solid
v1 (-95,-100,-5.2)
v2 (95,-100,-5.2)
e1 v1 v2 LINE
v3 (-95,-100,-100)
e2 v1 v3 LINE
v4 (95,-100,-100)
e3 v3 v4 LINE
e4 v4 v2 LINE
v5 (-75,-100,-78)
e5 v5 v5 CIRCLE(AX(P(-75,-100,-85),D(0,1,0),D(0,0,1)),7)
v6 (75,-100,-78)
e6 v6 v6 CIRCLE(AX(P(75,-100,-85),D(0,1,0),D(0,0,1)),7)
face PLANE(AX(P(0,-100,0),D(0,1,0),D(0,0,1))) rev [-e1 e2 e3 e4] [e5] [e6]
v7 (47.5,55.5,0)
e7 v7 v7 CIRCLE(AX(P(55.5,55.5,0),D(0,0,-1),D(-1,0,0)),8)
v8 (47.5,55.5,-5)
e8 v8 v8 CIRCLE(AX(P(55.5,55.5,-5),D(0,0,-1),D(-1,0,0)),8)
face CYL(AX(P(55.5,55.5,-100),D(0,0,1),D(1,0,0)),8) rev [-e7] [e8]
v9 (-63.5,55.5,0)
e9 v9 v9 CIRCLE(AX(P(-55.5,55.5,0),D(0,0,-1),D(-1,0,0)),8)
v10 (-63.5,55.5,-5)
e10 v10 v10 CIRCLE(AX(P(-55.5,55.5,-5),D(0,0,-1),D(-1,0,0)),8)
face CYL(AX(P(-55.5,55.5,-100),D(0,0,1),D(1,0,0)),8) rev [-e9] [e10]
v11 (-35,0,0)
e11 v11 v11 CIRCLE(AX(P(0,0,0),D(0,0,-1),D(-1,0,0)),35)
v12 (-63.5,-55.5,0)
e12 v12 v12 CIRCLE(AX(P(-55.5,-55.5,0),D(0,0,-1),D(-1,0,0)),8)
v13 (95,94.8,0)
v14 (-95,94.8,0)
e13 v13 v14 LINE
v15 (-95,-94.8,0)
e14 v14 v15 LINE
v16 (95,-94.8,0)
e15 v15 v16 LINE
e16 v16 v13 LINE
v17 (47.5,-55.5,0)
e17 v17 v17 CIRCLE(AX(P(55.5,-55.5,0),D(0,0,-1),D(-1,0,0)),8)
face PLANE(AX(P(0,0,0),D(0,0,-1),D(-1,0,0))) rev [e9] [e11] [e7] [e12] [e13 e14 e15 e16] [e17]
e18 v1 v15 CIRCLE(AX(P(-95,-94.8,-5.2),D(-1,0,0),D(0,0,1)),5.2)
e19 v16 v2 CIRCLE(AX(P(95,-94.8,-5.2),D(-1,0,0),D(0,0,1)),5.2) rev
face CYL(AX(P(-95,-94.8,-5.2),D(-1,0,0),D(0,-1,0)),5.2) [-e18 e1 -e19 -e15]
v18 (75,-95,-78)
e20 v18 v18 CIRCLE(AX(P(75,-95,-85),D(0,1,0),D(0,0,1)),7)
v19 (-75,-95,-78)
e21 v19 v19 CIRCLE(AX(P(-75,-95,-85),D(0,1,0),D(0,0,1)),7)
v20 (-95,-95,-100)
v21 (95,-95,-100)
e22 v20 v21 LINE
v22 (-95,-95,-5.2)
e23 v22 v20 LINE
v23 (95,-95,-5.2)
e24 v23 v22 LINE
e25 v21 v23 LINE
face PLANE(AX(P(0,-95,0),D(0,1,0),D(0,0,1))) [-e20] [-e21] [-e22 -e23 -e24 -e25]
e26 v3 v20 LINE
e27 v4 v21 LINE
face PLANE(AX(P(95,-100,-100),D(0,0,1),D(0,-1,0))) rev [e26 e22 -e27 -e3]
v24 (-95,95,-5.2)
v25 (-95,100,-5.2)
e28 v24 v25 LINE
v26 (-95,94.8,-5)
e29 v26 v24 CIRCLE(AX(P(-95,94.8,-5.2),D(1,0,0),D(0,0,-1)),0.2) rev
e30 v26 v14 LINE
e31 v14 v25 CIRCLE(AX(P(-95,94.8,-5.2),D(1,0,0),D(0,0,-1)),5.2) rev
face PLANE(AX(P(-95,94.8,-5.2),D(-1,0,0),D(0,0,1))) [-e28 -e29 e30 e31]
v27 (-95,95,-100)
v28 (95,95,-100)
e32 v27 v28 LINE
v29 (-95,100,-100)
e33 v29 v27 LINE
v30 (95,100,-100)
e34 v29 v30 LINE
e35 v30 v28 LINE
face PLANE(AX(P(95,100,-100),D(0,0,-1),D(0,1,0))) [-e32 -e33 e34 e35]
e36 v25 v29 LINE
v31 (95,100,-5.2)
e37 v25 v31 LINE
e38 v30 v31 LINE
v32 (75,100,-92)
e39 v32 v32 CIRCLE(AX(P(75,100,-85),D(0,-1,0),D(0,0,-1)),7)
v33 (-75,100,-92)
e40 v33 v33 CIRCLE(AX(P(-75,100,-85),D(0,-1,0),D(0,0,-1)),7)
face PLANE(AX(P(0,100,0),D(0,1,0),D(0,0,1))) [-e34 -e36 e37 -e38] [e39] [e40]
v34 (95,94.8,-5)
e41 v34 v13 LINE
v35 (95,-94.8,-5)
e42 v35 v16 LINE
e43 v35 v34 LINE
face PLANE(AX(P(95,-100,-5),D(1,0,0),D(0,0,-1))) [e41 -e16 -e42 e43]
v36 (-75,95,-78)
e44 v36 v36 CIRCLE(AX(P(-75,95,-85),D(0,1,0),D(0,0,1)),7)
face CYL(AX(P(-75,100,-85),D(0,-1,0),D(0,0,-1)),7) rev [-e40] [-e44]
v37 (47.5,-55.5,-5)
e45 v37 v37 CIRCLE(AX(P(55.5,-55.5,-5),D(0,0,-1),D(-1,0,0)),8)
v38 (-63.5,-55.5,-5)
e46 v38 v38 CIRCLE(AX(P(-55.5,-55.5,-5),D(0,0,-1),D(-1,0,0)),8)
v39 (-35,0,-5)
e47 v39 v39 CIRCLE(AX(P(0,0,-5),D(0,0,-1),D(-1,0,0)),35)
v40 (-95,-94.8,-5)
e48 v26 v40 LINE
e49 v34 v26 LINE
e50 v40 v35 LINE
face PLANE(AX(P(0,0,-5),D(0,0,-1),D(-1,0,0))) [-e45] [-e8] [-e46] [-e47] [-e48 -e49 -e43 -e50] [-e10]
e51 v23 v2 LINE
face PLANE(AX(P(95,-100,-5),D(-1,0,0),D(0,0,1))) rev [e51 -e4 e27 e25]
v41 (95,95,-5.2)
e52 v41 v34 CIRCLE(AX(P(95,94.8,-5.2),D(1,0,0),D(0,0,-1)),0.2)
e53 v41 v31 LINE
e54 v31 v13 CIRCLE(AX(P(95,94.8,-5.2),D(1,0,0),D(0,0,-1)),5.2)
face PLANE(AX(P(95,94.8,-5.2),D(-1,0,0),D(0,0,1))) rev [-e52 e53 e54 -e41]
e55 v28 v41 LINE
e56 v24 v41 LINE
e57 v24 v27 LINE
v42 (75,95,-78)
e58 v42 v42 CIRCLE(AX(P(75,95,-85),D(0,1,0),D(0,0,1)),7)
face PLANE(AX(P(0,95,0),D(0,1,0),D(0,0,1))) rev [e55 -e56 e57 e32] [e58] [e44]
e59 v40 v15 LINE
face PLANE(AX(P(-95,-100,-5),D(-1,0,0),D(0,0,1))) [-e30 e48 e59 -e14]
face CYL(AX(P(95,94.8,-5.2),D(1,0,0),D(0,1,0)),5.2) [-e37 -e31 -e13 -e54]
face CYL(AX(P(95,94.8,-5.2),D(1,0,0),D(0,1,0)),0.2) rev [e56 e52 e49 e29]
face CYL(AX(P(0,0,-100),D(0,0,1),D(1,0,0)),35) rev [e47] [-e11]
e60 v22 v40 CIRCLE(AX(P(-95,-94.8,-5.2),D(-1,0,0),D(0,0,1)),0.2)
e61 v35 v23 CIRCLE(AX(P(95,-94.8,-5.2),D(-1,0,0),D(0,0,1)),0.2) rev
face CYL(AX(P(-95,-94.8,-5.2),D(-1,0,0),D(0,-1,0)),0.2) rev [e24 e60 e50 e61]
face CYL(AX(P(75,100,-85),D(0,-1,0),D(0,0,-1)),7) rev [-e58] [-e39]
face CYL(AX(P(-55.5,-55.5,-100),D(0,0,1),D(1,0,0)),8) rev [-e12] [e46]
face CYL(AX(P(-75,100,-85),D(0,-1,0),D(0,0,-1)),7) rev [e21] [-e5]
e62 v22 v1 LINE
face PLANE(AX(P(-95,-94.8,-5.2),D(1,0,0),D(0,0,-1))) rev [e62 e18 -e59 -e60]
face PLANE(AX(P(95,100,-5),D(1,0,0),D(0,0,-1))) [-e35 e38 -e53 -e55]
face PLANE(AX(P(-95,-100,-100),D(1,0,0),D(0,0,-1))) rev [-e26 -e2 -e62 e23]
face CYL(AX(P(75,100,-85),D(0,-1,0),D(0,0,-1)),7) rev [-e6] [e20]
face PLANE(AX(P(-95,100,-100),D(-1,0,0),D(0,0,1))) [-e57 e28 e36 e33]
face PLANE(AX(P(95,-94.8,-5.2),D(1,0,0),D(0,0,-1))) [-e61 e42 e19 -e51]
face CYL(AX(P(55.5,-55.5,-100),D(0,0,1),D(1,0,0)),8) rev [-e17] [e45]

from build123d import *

# Parameters (mm, degrees)
SKETCH1_W                    = 190
SKETCH1_H                    = 200
BASE_FLANGE1_DEPTH           = 5
EDGE_FLANGE1_STRIP_W         = 20.4
EDGE_FLANGE1_STRIP_H         = 5
EDGE_FLANGE1_STRIP_CUT_DEPTH = 190
EDGE_FLANGE1_DEPTH           = 190
EDGE_FLANGE2_STRIP_W         = 20.4
EDGE_FLANGE2_STRIP_H         = 5
EDGE_FLANGE2_STRIP_CUT_DEPTH = 190
EDGE_FLANGE2_DEPTH           = 190
CUT_EXTRUDE1_DEPTH           = 171.367250374
CUT_EXTRUDE1_DEPTH_BACK      = 171.367250374
SKETCH12_R                   = 35
CUT_EXTRUDE2_DEPTH           = 171.367250374
CUT_EXTRUDE2_DEPTH_BACK      = 171.367250374
SKETCH13_R                   = 8
CUT_EXTRUDE3_DEPTH           = 243.950612265
CUT_EXTRUDE3_DEPTH_BACK      = 243.950612265
SKETCH14_R                   = 7


# Sheet-metal steps are written as plain solids
with BuildPart() as part:
    # Sketch1 → Base-Flange1 (new body)
    with BuildSketch(Plane.XY):
        Rectangle(SKETCH1_W, SKETCH1_H)
    extrude(amount=-BASE_FLANGE1_DEPTH)

    # Edge-Flange1 strip (across the edge) → Edge-Flange1 strip cut (cut)
    with BuildSketch(Plane(origin=(-95, 100, -5), x_dir=(0, -1, 0), z_dir=(1, 0, 0))):
        with Locations((-5, -2.5)):
            Rectangle(EDGE_FLANGE1_STRIP_W, EDGE_FLANGE1_STRIP_H)
    extrude(amount=EDGE_FLANGE1_STRIP_CUT_DEPTH, mode=Mode.SUBTRACT)

    # Edge-Flange1 section (across the edge) → Edge-Flange1 (add)
    with BuildSketch(Plane(origin=(-95, 100, -5), x_dir=(0, -1, 0), z_dir=(1, 0, 0))):
        with BuildLine():
            Line((0, 0.2), (0, 95))
            Line((0, 95), (5, 95))
            Line((5, 95), (5, 0.2))
            ThreePointArc((5, 0.2), (5.058578644, 0.058578644), (5.2, 0))
            Line((5.2, 0), (5.2, -5))
            ThreePointArc((5.2, -5), (1.523044738, -3.476955262), (0, 0.2))
        make_face()
    extrude(amount=EDGE_FLANGE1_DEPTH)

    # Edge-Flange2 strip (across the edge) → Edge-Flange2 strip cut (cut)
    with BuildSketch(Plane(origin=(95, -100, -5), x_dir=(0, 1, 0), z_dir=(-1, 0, 0))):
        with Locations((-5, -2.5)):
            Rectangle(EDGE_FLANGE2_STRIP_W, EDGE_FLANGE2_STRIP_H)
    extrude(amount=EDGE_FLANGE2_STRIP_CUT_DEPTH, mode=Mode.SUBTRACT)

    # Edge-Flange2 section (across the edge) → Edge-Flange2 (add)
    with BuildSketch(Plane(origin=(95, -100, -5), x_dir=(0, 1, 0), z_dir=(-1, 0, 0))):
        with BuildLine():
            Line((0, 0.2), (0, 95))
            Line((0, 95), (5, 95))
            Line((5, 95), (5, 0.2))
            ThreePointArc((5, 0.2), (5.058578644, 0.058578644), (5.2, 0))
            Line((5.2, 0), (5.2, -5))
            ThreePointArc((5.2, -5), (1.523044738, -3.476955262), (0, 0.2))
        make_face()
    extrude(amount=EDGE_FLANGE2_DEPTH)

    # Sketch12 → Cut-Extrude1 (cut, two sides: drawn at the far end of the back side and taken through both)
    with BuildSketch(Plane.XY.offset(-CUT_EXTRUDE1_DEPTH_BACK)):
        with Locations(Location((0, 0, 0), (0, 0, 180))):
            Circle(SKETCH12_R)
    extrude(amount=CUT_EXTRUDE1_DEPTH + CUT_EXTRUDE1_DEPTH_BACK, mode=Mode.SUBTRACT)

    # Sketch13 → Cut-Extrude2 (cut, two sides: drawn at the far end of the back side and taken through both)
    with BuildSketch(Plane.XY.offset(-CUT_EXTRUDE2_DEPTH_BACK)):
        with Locations(Location((55.5, 55.5, 0), (0, 0, 180))):
            Circle(SKETCH13_R)
        with Locations(Location((-55.5, 55.5, 0), (0, 0, 180))):
            Circle(SKETCH13_R)
        with Locations(Location((-55.5, -55.5, 0), (0, 0, 180))):
            Circle(SKETCH13_R)
        with Locations(Location((55.5, -55.5, 0), (0, 0, 180))):
            Circle(SKETCH13_R)
    extrude(amount=CUT_EXTRUDE2_DEPTH + CUT_EXTRUDE2_DEPTH_BACK, mode=Mode.SUBTRACT)

    # Sketch14 → Cut-Extrude3 (cut, two sides: drawn at the far end of the back side and taken through both)
    with BuildSketch(Plane(origin=(0, -100, 0), x_dir=(-1, 0, 0), z_dir=(0, -1, 0)).offset(-CUT_EXTRUDE3_DEPTH_BACK)):
        with Locations(Location((75, 85, 0), (0, 0, 270))):
            Circle(SKETCH14_R)
        with Locations(Location((-75, 85, 0), (0, 0, 270))):
            Circle(SKETCH14_R)
    extrude(amount=CUT_EXTRUDE3_DEPTH + CUT_EXTRUDE3_DEPTH_BACK, mode=Mode.SUBTRACT)


solid = part.part
